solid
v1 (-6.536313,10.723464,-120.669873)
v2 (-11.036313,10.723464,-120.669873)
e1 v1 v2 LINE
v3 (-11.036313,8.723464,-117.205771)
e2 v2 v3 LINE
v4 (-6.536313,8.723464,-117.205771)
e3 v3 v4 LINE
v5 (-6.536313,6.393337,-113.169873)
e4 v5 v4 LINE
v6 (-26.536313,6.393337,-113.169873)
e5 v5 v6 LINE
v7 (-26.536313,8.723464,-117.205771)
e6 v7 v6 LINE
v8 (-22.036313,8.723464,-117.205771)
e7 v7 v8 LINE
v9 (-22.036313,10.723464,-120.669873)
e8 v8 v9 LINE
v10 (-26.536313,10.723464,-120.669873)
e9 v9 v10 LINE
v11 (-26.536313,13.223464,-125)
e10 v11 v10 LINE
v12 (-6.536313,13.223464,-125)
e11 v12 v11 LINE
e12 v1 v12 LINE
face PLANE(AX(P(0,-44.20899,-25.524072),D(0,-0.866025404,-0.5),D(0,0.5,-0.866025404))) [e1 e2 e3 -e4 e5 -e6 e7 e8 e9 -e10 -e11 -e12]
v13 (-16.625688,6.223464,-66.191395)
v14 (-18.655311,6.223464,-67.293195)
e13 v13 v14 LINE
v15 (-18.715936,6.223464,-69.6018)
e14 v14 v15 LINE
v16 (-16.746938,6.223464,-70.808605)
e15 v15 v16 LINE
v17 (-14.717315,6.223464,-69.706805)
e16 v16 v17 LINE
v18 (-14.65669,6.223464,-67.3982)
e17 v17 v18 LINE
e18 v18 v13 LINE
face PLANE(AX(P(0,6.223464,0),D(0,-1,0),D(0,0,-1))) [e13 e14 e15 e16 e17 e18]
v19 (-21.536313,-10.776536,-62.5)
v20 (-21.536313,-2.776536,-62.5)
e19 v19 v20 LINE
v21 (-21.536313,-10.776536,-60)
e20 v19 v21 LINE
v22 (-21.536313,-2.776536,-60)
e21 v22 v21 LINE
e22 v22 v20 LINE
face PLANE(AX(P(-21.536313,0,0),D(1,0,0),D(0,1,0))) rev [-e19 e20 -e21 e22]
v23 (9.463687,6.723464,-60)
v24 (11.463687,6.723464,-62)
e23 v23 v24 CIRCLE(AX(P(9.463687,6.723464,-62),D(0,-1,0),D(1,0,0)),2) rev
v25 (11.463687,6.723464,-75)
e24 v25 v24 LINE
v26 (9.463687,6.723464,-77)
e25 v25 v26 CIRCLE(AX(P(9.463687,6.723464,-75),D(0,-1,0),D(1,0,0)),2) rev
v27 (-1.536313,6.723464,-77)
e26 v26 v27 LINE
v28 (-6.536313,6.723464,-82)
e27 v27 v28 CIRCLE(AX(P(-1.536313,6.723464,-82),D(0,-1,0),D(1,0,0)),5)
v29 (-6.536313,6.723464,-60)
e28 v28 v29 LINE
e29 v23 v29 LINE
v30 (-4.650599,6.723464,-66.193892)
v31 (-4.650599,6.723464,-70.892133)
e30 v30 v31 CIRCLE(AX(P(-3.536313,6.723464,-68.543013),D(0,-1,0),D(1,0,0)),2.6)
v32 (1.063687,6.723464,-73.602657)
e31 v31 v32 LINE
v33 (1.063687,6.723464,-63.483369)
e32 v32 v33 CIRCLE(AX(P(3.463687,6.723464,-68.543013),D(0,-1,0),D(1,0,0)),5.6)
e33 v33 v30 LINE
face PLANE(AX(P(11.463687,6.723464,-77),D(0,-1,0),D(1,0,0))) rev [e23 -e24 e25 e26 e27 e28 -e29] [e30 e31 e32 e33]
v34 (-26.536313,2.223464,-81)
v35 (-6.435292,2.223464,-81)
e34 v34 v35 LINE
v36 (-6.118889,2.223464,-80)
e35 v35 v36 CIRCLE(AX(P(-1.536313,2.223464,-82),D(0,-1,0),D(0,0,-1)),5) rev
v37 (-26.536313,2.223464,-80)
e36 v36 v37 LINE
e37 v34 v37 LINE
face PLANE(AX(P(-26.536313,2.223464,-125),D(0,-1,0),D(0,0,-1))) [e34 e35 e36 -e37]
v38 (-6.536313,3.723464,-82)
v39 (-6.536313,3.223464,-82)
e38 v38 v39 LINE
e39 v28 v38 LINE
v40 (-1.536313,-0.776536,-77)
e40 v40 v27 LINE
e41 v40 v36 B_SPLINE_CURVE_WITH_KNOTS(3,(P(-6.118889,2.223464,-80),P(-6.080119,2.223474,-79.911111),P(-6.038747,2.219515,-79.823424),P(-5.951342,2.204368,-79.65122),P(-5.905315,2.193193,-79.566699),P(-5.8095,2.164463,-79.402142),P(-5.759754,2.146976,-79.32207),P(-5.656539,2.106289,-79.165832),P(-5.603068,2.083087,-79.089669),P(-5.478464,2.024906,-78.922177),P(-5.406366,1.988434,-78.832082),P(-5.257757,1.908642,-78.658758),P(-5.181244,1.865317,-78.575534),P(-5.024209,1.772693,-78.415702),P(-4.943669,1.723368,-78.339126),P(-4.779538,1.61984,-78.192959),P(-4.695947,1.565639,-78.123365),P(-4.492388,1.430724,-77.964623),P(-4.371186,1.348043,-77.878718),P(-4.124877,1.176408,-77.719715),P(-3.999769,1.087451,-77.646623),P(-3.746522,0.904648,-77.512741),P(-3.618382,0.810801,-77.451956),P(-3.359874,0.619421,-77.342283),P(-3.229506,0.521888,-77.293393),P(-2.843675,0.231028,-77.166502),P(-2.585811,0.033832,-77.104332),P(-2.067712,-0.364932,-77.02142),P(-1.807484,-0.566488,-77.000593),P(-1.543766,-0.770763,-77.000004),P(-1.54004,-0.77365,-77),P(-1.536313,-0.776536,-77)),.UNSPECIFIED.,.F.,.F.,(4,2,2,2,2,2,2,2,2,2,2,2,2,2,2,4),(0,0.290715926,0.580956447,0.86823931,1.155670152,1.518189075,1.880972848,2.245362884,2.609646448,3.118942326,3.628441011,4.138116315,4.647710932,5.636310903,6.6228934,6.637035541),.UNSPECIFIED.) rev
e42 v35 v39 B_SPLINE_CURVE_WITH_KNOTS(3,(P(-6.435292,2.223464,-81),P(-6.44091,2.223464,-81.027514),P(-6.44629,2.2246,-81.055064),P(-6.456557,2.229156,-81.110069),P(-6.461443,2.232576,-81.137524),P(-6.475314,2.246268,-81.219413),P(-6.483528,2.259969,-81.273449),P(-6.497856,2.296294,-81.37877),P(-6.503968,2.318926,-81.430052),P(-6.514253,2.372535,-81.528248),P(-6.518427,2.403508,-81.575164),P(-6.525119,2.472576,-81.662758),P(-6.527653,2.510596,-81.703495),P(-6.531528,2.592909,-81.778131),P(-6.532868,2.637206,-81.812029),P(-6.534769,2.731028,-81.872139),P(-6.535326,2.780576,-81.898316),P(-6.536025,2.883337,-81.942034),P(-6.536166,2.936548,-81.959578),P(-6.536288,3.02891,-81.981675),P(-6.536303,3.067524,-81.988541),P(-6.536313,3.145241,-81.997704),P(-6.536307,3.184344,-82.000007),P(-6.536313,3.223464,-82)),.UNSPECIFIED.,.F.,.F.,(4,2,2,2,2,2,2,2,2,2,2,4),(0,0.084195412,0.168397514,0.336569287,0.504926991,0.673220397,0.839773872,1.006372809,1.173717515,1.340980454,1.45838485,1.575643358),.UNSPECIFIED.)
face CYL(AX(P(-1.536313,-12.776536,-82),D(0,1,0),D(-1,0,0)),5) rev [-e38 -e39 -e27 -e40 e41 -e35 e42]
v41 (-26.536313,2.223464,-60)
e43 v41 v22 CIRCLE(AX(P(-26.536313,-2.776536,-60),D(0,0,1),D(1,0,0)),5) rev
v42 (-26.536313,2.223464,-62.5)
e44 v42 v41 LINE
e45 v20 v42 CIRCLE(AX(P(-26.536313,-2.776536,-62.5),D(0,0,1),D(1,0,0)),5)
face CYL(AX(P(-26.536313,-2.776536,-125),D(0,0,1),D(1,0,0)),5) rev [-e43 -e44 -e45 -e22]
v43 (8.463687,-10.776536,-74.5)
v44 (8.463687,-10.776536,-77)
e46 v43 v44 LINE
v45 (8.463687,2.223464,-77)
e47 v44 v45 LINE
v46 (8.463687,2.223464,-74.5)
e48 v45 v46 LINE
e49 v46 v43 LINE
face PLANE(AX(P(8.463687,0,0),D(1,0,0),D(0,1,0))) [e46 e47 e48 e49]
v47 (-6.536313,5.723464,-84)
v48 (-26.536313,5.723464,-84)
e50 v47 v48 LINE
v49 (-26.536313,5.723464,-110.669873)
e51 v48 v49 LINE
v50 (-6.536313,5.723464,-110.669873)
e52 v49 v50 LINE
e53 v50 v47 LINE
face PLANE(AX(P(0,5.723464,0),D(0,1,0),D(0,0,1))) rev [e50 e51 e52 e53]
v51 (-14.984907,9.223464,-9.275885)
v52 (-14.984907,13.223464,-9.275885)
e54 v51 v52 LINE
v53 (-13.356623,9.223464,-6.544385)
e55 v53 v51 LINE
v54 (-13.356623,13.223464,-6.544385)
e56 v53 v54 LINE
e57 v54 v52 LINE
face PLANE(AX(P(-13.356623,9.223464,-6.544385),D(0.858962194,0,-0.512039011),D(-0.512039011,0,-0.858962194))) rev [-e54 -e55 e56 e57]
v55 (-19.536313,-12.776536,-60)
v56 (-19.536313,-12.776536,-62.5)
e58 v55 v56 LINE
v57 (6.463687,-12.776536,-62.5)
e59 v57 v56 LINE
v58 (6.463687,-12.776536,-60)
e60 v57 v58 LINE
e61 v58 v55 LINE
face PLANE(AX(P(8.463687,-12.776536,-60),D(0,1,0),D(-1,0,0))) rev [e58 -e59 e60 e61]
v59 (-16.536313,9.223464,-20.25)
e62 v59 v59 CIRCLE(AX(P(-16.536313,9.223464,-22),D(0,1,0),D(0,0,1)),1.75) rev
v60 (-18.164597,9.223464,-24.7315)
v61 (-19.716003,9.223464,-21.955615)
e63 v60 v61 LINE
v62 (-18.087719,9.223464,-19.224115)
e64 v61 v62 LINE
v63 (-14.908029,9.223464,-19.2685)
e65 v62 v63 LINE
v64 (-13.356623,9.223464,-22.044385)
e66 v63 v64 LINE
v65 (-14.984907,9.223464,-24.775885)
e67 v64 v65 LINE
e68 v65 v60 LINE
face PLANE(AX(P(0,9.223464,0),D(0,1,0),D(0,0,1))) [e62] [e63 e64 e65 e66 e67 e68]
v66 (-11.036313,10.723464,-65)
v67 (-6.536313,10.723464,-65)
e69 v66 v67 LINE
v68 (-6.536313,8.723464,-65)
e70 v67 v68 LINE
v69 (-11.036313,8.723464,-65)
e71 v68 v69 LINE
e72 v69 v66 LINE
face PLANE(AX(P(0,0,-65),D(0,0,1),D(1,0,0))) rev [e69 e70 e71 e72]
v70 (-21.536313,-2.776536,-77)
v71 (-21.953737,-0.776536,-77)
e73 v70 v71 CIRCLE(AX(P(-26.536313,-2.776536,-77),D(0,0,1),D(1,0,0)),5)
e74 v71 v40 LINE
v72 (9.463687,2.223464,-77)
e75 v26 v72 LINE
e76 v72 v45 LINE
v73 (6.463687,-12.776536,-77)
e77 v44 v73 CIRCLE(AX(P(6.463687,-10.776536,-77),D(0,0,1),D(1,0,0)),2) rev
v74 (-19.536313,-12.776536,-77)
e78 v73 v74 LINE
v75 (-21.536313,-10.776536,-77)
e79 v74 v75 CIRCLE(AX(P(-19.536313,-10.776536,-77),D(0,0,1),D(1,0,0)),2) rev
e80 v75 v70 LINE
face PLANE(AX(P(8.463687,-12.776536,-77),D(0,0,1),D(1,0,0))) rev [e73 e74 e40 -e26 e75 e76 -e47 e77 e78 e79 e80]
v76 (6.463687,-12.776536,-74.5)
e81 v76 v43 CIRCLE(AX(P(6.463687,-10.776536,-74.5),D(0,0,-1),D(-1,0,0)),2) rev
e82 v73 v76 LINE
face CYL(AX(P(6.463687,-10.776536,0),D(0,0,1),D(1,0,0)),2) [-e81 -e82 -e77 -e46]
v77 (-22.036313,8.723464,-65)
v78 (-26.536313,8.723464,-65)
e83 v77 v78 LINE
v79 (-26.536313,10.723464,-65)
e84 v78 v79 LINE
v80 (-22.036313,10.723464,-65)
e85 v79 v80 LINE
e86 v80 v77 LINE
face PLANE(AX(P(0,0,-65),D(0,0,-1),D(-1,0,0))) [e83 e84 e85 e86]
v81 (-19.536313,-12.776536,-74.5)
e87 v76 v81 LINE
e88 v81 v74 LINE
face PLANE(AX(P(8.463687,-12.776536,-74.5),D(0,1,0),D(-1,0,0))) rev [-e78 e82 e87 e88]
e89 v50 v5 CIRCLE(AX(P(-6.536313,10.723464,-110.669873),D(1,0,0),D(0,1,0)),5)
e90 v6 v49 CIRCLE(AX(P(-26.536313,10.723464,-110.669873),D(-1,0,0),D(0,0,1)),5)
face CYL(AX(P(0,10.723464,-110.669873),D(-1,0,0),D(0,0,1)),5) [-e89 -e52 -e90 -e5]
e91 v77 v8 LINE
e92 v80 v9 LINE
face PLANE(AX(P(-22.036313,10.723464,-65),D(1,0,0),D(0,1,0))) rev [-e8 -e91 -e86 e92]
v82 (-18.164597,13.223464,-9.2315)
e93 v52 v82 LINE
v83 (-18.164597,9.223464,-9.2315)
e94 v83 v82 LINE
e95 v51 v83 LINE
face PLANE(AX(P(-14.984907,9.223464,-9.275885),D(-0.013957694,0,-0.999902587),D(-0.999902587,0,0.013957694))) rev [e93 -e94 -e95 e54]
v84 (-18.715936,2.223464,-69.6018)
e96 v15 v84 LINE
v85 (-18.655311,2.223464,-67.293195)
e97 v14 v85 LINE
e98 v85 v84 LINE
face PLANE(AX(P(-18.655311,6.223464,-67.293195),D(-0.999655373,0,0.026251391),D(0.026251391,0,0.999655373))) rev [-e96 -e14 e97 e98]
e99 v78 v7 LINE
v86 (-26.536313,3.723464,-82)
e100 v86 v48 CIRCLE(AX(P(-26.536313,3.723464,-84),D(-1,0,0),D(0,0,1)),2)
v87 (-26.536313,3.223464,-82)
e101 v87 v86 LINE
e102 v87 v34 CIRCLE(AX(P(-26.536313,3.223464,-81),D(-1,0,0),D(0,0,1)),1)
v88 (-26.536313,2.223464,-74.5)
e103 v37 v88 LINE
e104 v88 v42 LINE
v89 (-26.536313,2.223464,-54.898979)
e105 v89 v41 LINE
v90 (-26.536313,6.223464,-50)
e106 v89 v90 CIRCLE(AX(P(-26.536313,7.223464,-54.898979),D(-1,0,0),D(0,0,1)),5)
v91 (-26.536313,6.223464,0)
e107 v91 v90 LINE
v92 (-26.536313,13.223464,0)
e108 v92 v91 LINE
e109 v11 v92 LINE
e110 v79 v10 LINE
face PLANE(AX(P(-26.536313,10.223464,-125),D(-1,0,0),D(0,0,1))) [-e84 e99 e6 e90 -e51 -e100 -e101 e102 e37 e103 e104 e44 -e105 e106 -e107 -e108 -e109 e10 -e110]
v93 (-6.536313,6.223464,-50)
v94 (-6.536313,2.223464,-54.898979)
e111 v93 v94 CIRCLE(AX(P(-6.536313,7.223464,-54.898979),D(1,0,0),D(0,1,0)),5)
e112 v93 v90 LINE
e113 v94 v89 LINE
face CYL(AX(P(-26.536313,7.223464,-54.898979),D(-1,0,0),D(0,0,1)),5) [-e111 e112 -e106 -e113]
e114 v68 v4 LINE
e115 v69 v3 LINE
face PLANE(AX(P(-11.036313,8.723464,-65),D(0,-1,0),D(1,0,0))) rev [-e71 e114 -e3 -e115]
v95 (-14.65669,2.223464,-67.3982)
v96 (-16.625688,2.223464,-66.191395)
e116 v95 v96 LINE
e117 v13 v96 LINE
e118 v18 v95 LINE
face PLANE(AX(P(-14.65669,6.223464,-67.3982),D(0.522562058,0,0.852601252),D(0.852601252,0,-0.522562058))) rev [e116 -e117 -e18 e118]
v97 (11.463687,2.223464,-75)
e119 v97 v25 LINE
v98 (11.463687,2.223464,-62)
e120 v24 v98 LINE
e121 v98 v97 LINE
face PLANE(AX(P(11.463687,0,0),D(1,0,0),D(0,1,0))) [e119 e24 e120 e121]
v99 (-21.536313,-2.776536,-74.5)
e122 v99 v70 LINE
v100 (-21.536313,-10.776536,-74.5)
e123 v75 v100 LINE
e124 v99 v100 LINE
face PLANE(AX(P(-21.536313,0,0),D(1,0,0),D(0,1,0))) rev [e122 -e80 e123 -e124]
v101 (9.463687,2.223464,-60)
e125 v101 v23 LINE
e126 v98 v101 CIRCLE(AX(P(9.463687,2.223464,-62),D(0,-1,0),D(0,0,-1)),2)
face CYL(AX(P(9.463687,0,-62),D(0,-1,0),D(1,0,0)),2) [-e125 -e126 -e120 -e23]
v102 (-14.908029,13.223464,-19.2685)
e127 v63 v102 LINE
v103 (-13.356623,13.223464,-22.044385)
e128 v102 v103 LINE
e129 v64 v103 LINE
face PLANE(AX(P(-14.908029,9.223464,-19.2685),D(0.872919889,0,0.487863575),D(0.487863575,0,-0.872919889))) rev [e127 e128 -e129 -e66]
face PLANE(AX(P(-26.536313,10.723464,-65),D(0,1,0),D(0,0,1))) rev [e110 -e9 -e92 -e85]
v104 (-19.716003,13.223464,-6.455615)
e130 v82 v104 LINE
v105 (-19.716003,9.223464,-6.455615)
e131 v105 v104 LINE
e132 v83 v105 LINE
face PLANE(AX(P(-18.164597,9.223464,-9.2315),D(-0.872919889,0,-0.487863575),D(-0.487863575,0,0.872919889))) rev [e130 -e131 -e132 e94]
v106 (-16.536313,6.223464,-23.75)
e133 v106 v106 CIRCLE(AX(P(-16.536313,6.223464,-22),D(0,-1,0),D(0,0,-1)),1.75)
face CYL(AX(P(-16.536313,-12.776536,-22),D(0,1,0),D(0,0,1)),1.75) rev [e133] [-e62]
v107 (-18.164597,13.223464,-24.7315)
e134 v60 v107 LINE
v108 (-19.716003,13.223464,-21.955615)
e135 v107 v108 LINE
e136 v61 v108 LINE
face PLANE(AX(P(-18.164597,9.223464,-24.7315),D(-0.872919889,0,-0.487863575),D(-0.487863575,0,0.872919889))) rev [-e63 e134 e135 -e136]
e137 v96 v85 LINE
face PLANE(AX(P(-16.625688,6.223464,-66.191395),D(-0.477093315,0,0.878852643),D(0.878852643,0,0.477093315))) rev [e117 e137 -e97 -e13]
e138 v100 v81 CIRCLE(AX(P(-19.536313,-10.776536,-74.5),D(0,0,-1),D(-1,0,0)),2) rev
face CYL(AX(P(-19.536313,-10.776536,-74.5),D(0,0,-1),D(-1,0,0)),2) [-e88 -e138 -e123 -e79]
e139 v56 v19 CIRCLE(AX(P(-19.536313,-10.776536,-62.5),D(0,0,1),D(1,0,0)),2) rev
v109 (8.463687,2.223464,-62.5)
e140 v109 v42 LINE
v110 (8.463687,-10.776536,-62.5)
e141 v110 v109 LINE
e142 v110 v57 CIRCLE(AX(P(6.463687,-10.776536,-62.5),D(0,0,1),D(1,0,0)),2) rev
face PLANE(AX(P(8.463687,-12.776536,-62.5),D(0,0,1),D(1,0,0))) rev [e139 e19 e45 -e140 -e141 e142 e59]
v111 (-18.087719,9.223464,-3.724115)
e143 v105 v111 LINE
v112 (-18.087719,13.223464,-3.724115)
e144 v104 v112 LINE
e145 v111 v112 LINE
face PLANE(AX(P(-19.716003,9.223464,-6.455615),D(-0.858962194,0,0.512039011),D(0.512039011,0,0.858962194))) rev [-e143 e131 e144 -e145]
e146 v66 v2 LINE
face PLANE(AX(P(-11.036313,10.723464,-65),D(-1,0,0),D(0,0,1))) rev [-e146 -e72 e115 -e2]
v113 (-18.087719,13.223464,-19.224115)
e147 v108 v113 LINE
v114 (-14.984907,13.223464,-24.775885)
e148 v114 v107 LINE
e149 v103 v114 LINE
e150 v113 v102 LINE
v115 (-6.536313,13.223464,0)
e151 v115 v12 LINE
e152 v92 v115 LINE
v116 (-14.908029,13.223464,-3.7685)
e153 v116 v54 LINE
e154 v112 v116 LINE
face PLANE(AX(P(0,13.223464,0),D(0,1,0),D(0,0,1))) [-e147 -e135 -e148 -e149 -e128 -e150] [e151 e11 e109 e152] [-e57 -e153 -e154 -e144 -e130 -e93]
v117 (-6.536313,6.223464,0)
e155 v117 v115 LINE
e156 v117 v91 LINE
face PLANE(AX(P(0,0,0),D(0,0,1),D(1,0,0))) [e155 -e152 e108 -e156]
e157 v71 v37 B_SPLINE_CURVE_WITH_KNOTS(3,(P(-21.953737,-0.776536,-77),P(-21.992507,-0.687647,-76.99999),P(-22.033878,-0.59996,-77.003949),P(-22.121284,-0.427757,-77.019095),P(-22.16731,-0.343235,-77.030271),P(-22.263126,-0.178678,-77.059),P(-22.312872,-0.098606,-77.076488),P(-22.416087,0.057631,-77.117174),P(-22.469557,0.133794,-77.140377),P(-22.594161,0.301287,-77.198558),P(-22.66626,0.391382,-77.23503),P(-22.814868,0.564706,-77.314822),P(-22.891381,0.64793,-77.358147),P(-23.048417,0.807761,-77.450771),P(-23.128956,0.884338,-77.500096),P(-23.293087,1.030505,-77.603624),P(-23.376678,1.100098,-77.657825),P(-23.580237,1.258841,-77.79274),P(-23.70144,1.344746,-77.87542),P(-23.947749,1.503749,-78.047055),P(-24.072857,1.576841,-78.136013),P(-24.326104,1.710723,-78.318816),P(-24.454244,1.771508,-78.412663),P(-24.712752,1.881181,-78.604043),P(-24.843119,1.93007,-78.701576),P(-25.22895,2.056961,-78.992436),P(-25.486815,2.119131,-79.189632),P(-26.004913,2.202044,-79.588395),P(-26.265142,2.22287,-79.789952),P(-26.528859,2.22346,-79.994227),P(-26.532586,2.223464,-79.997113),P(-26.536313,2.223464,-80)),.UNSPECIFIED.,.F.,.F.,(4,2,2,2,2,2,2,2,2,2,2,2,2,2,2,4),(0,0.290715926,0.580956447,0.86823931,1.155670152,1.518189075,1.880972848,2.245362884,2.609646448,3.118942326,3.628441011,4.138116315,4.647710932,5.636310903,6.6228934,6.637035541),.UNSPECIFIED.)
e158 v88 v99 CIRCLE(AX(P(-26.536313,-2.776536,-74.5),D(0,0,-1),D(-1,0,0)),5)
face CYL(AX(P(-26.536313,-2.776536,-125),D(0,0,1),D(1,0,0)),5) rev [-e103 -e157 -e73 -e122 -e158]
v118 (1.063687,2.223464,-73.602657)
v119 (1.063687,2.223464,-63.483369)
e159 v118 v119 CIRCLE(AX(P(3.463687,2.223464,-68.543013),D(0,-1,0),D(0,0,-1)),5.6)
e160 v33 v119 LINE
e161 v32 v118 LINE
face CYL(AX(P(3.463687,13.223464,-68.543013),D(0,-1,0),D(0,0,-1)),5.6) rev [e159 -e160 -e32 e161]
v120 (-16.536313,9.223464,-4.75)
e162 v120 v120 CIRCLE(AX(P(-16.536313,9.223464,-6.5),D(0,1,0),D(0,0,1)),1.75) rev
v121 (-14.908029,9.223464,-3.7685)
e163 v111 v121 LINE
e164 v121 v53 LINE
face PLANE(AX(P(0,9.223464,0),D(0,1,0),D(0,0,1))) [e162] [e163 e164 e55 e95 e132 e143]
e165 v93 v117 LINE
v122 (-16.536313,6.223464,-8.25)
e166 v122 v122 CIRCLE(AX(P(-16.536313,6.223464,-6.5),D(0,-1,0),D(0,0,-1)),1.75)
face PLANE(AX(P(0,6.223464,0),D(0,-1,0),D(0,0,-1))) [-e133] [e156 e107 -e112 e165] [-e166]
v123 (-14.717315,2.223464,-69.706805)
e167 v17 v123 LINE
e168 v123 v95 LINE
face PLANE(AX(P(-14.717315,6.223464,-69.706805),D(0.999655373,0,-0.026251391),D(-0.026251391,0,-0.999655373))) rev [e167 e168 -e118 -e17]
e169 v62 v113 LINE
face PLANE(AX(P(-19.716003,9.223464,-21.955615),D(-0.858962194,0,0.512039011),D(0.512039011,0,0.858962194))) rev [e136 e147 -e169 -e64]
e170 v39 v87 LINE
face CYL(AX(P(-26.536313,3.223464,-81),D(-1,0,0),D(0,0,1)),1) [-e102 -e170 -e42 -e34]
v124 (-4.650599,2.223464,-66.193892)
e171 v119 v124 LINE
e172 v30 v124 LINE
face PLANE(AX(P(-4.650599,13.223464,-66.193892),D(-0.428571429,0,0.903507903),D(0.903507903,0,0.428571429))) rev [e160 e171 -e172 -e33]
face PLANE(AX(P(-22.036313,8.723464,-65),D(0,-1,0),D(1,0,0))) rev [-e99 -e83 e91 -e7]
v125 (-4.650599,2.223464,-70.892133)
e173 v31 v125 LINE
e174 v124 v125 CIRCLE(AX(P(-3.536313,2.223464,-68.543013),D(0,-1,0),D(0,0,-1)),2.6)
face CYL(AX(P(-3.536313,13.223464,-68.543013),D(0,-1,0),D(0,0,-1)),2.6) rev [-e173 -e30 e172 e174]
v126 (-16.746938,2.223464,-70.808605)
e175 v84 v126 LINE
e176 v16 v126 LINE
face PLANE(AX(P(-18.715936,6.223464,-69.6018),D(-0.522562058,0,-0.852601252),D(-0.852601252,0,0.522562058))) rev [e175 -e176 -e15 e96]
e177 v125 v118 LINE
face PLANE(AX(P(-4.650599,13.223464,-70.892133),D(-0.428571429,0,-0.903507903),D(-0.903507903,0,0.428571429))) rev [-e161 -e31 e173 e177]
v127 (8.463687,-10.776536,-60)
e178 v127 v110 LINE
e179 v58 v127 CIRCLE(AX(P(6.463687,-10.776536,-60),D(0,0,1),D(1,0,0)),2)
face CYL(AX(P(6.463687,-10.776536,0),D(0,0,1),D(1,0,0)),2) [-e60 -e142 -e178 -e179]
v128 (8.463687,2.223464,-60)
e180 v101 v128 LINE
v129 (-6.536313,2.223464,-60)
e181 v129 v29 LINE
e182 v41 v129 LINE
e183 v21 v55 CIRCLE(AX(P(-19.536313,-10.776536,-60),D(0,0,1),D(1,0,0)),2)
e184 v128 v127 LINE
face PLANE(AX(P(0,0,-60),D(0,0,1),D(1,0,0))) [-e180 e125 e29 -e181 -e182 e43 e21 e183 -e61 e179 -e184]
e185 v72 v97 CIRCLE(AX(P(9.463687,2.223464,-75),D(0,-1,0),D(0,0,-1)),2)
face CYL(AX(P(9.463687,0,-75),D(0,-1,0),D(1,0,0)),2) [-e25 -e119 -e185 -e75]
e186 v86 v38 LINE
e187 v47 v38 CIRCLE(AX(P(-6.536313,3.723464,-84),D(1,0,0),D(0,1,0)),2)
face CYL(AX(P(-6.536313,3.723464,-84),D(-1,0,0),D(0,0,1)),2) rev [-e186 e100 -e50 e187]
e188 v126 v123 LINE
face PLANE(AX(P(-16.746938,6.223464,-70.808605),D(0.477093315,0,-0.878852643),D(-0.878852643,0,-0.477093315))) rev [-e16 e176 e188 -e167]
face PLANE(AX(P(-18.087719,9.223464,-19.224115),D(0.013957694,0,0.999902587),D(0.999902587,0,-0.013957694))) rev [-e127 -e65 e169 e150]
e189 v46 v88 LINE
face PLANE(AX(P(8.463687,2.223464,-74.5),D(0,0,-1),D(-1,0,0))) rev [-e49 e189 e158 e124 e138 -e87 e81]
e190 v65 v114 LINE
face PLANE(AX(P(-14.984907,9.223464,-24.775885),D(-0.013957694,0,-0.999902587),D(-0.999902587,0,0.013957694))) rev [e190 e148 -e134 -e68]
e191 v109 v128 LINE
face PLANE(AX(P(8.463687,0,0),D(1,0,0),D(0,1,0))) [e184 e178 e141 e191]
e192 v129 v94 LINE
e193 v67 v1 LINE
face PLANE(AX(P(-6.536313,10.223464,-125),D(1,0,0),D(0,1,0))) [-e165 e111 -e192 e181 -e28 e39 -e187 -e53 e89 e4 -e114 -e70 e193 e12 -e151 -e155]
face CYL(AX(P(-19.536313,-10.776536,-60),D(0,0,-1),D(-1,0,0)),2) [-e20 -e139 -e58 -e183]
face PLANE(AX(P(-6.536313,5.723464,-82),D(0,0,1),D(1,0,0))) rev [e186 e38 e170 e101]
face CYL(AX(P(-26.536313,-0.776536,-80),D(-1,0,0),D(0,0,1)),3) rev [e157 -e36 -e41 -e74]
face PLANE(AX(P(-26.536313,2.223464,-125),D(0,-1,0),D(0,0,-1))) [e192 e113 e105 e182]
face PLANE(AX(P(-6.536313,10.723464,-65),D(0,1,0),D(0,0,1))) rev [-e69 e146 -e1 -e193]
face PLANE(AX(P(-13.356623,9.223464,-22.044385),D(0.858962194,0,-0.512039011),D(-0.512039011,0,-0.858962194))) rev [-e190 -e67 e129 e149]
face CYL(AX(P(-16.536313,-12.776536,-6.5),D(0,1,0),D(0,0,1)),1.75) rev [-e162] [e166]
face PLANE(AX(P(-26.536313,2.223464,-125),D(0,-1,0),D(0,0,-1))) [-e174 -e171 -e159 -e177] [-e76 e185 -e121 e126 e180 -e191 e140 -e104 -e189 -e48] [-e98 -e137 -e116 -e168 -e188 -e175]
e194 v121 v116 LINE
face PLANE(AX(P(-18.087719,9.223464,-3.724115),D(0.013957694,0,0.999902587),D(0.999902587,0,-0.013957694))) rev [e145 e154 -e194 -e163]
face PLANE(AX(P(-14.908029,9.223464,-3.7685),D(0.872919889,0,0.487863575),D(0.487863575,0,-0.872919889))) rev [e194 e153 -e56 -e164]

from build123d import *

# Parameters (mm, degrees)
SKETCH1_W                = 20
SKETCH1_H                = 8
BOSS_EXTRUDE1_DEPTH      = 125
CUT_EXTRUDE1_DEPTH       = 60
SKETCH3_W                = 20
SKETCH3_H                = 125
BOSS_EXTRUDE2_DEPTH      = 3
SKETCH5_W                = 4.5
SKETCH5_H                = 2
CUT_EXTRUDE2_DEPTH       = 60
BOSS_EXTRUDE5_DEPTH      = 15
BOSS_EXTRUDE5_DEPTH_BACK = 15
SKETCH9_W                = 2.5
SKETCH9_H                = 15
SKETCH10_W               = 17
SKETCH10_H               = 4.5
BOSS_EXTRUDE6_DEPTH      = 18
CUT_EXTRUDE3_DEPTH       = 129.663032374
CUT_EXTRUDE4_DEPTH       = 4
FILLET1_R                = 5
FILLET2_R                = 3
FILLET3_R                = 5
FILLET4_R                = 2
SKETCH13_W               = 46.736094472
SKETCH13_H               = 46.819354585
CUT_EXTRUDE5_DEPTH       = 30
SKETCH14_W               = 30.537207939
SKETCH14_H               = 50.61246041
CUT_EXTRUDE6_DEPTH       = 3.5
FILLET5_R                = 5
FILLET6_R                = 2
FILLET7_R                = 1
FILLET8_R                = 2
SKETCH15_W               = 20
SKETCH15_H               = 60
CUT_EXTRUDE7_DEPTH       = 5
SKETCH16_W               = 20
SKETCH16_H               = 60
BOSS_EXTRUDE7_DEPTH      = 1.5
SKETCH17_W               = 20
SKETCH17_H               = 10
BOSS_EXTRUDE8_DEPTH      = 4
FILLET9_R                = 5
SKETCH18_R               = 1.75
CUT_EXTRUDE8_DEPTH       = 131.403895283
CUT_EXTRUDE9_DEPTH       = 4


# Some blends are built 0.0001 mm under size
with BuildPart() as part:
    # Sketch1 → Boss-Extrude1 (new body)
    with BuildSketch(Plane.XY):
        with Locations((-16.536312849, 6.223463687)):
            Rectangle(SKETCH1_W, SKETCH1_H)
    extrude(amount=-BOSS_EXTRUDE1_DEPTH)

    # Sketch2 → Cut-Extrude1 (cut)
    with BuildSketch(Plane.XY):
        Polygon((-26.536312849, 7.723463687), (-22.186312849, 7.723463687), (-22.186312849, 5.723463687), (-23.686312849, 5.723463687), (-23.686312849, 4.223463687), (-22.186312849, 4.223463687), (-22.186312849, 2.723463687), (-20.536312849, 2.723463687), (-20.536312849, 7.723463687), (-12.536312849, 7.723463687), (-12.536312849, 2.723463687), (-10.886312849, 2.723463687), (-10.886312849, 4.223463687), (-9.386312849, 4.223463687), (-9.386312849, 5.723463687), (-10.886312849, 5.723463687), (-10.886312849, 7.723463687), (-6.536312849, 7.723463687), (-6.536312849, 2.223463687), (-26.536312849, 2.223463687), align=None)
    extrude(amount=-CUT_EXTRUDE1_DEPTH, mode=Mode.SUBTRACT)

    # Sketch3 → Boss-Extrude2 (add)
    with BuildSketch(Plane(origin=(0, 10.223463687, 0), x_dir=(1, 0, 0), z_dir=(0, 1, 0))):
        with Locations((-16.536312849, 62.5)):
            Rectangle(SKETCH3_W, SKETCH3_H)
    extrude(amount=BOSS_EXTRUDE2_DEPTH)

    # Sketch5 → Cut-Extrude2 (cut)
    with BuildSketch(Plane(origin=(0, 0, -125), x_dir=(-1, 0, 0), z_dir=(0, 0, -1))):
        with Locations((8.786312849, 9.723463687)):
            Rectangle(SKETCH5_W, SKETCH5_H)
        with Locations((24.286312849, 9.723463687)):
            Rectangle(SKETCH5_W, SKETCH5_H)
    extrude(amount=-CUT_EXTRUDE2_DEPTH, mode=Mode.SUBTRACT)

    # Sketch9 → Boss-Extrude5 (add, two sides: drawn at the far end of the back side and taken through both)
    with BuildSketch(Plane(origin=(-6.536312849, 0, 0), x_dir=(0, 0, -1), z_dir=(1, 0, 0)).offset(-BOSS_EXTRUDE5_DEPTH_BACK)):
        with Locations((61.25, -5.276536313)):
            Rectangle(SKETCH9_W, SKETCH9_H)
        with Locations((75.75, -5.276536313)):
            Rectangle(SKETCH9_W, SKETCH9_H)
    extrude(amount=BOSS_EXTRUDE5_DEPTH + BOSS_EXTRUDE5_DEPTH_BACK)

    # Sketch10 → Boss-Extrude6 (add)
    with BuildSketch(Plane(origin=(-6.536312849, 0, 0), x_dir=(0, 0, -1), z_dir=(1, 0, 0))):
        with Locations((68.5, 4.473463687)):
            Rectangle(SKETCH10_W, SKETCH10_H)
    extrude(amount=BOSS_EXTRUDE6_DEPTH)

    # Sketch11 → Cut-Extrude3 (cut, through all)
    with BuildSketch(Plane.XZ.offset(-2.223463687)):
        with BuildLine():
            Line((-4.650598563, -66.193892243), (1.063687151, -63.483368535))
            ThreePointArc((1.063687151, -63.483368535), (9.063687151, -68.543012791), (1.063687151, -73.602657047))
            Line((1.063687151, -73.602657047), (-4.650598563, -70.892133338))
            ThreePointArc((-4.650598563, -70.892133338), (-6.136312849, -68.543012791), (-4.650598563, -66.193892243))
        make_face()
    extrude(amount=-CUT_EXTRUDE3_DEPTH, mode=Mode.SUBTRACT)

    # Sketch12 → Cut-Extrude4 (cut)
    with BuildSketch(Plane.XZ.offset(-2.223463687)):
        Polygon((-14.717314599, -69.706805379), (-14.656689608, -67.398200185), (-16.625687858, -66.191394806), (-18.6553111, -67.293194621), (-18.71593609, -69.601799815), (-16.74693784, -70.808605194), align=None)
    extrude(amount=-CUT_EXTRUDE4_DEPTH, mode=Mode.SUBTRACT)

    # Fillet1
    fillet1_edges = [part.edges().sort_by_distance(p)[0] for p in [
        (-6.536312849, 4.473463687, -77),
    ]]
    fillet(fillet1_edges, radius=FILLET1_R)

    # Fillet2
    fillet2_edges = [part.edges().sort_by_distance(p)[0] for p in [
        (-11.536312849, 2.223463687, -77),
    ]]
    fillet(fillet2_edges, radius=FILLET2_R)

    # Fillet3
    fillet3_edges = [part.edges().sort_by_distance(p)[0] for p in [
        (-21.536312849, 2.223463687, -61.25),
        (-21.536312849, 2.223463687, -77.25),
    ]]
    fillet(fillet3_edges, radius=FILLET3_R - 0.0001)  # a hair under: the kernel refuses the full size

    # Fillet4
    fillet4_edges = [part.edges().sort_by_distance(p)[0] for p in [
        (11.463687151, 4.473463687, -77),
        (11.463687151, 4.473463687, -60),
    ]]
    fillet(fillet4_edges, radius=FILLET4_R)

    # Sketch13 → Cut-Extrude5 (cut)
    with BuildSketch(Plane(origin=(0, -44.208989971, -25.52407226), x_dir=(-1, 0, 0), z_dir=(0, 0.866025403784438, 0.500000000000001))):
        with Locations((16.217588554, -108.832455191)):
            Rectangle(SKETCH13_W, SKETCH13_H)
    extrude(amount=-CUT_EXTRUDE5_DEPTH, mode=Mode.SUBTRACT)

    # Sketch14 → Cut-Extrude6 (cut)
    with BuildSketch(Plane.XZ.offset(-2.223463687)):
        with Locations((-21.804916819, -107.306230205)):
            Rectangle(SKETCH14_W, SKETCH14_H)
    extrude(amount=-CUT_EXTRUDE6_DEPTH, mode=Mode.SUBTRACT)

    # Fillet5
    fillet5_edges = [part.edges().sort_by_distance(p)[0] for p in [
        (-16.536312849, 5.723463687, -112.009618943),
    ]]
    fillet(fillet5_edges, radius=FILLET5_R)

    # Fillet6
    fillet6_edges = [part.edges().sort_by_distance(p)[0] for p in [
        (-16.536312849, 5.723463687, -82),
    ]]
    fillet(fillet6_edges, radius=FILLET6_R)

    # Fillet7
    fillet7_edges = [part.edges().sort_by_distance(p)[0] for p in [
        (-16.536312849, 2.223463687, -82),
    ]]
    fillet(fillet7_edges, radius=FILLET7_R)

    # Fillet8
    fillet8_edges = [part.edges().sort_by_distance(p)[0] for p in [
        (-21.536312849, -12.776536313, -61.25),
        (8.463687151, -12.776536313, -61.25),
        (-21.536312849, -12.776536313, -75.75),
        (8.463687151, -12.776536313, -75.75),
    ]]
    fillet(fillet8_edges, radius=FILLET8_R)

    # Sketch15 → Cut-Extrude7 (cut)
    with BuildSketch(Plane.XZ.offset(-2.723463687)):
        with Locations((-16.536312849, -30)):
            Rectangle(SKETCH15_W, SKETCH15_H)
    extrude(amount=-CUT_EXTRUDE7_DEPTH, mode=Mode.SUBTRACT)

    # Sketch16 → Boss-Extrude7 (add)
    with BuildSketch(Plane.XZ.offset(-7.723463687)):
        with Locations((-16.536312849, -30)):
            Rectangle(SKETCH16_W, SKETCH16_H)
    extrude(amount=BOSS_EXTRUDE7_DEPTH)

    # Sketch17 → Boss-Extrude8 (add)
    with BuildSketch(Plane.XZ.offset(-6.223463687)):
        with Locations((-16.536312849, -55)):
            Rectangle(SKETCH17_W, SKETCH17_H)
    extrude(amount=BOSS_EXTRUDE8_DEPTH)

    # Fillet9
    # the kernel refuses this fillet: 5 mm, written as the material it takes off along each edge
    with BuildSketch(Plane(origin=(5.711135865, 2.223463687, -50), x_dir=(0, 1.0, -1.572075802868717e-12), z_dir=(-1, 0, 0))) as fillet9_piece_1:
        with BuildLine():
            CenterArc((5, 4.898979486), FILLET9_R, 180, 78.463040967)
            Line((0, 4.898979486), (-0.1, 4.898979486))
            Line((-0.1, 4.898979486), (-0.1, 0))
            Line((-0.1, 0), (0, -0.1))
            ThreePointArc((0, -0.1), (2, -0.1), (3.98, -0.09797959))
            Line((3.98, -0.09797959), (4, 0))
        make_face()
    extrude(amount=44.494897428, mode=Mode.SUBTRACT)

    # Sketch18 → Cut-Extrude8 (cut, through all)
    with BuildSketch(Plane(origin=(0, 13.223463687, 0), x_dir=(1, 0, 0), z_dir=(0, 1, 0))):
        with Locations(Location((-16.536312849, 22, 0), (0, 0, 270))):
            Circle(SKETCH18_R)
        with Locations(Location((-16.536312849, 6.5, 0), (0, 0, 270))):
            Circle(SKETCH18_R)
    extrude(amount=-CUT_EXTRUDE8_DEPTH, mode=Mode.SUBTRACT)

    # Sketch19 → Cut-Extrude9 (cut)
    with BuildSketch(Plane(origin=(0, 13.223463687, 0), x_dir=(1, 0, 0), z_dir=(0, 1, 0))):
        Polygon((-18.087719019, 19.224114754), (-14.908028793, 19.268500223), (-13.356622624, 22.044385468), (-14.98490668, 24.775885246), (-18.164596905, 24.731499777), (-19.716003075, 21.955614532), align=None)
        Polygon((-14.908028793, 3.768500223), (-13.356622624, 6.544385468), (-14.98490668, 9.275885246), (-18.164596905, 9.231499777), (-19.716003075, 6.455614532), (-18.087719019, 3.724114754), align=None)
    extrude(amount=-CUT_EXTRUDE9_DEPTH, mode=Mode.SUBTRACT)


solid = part.part
